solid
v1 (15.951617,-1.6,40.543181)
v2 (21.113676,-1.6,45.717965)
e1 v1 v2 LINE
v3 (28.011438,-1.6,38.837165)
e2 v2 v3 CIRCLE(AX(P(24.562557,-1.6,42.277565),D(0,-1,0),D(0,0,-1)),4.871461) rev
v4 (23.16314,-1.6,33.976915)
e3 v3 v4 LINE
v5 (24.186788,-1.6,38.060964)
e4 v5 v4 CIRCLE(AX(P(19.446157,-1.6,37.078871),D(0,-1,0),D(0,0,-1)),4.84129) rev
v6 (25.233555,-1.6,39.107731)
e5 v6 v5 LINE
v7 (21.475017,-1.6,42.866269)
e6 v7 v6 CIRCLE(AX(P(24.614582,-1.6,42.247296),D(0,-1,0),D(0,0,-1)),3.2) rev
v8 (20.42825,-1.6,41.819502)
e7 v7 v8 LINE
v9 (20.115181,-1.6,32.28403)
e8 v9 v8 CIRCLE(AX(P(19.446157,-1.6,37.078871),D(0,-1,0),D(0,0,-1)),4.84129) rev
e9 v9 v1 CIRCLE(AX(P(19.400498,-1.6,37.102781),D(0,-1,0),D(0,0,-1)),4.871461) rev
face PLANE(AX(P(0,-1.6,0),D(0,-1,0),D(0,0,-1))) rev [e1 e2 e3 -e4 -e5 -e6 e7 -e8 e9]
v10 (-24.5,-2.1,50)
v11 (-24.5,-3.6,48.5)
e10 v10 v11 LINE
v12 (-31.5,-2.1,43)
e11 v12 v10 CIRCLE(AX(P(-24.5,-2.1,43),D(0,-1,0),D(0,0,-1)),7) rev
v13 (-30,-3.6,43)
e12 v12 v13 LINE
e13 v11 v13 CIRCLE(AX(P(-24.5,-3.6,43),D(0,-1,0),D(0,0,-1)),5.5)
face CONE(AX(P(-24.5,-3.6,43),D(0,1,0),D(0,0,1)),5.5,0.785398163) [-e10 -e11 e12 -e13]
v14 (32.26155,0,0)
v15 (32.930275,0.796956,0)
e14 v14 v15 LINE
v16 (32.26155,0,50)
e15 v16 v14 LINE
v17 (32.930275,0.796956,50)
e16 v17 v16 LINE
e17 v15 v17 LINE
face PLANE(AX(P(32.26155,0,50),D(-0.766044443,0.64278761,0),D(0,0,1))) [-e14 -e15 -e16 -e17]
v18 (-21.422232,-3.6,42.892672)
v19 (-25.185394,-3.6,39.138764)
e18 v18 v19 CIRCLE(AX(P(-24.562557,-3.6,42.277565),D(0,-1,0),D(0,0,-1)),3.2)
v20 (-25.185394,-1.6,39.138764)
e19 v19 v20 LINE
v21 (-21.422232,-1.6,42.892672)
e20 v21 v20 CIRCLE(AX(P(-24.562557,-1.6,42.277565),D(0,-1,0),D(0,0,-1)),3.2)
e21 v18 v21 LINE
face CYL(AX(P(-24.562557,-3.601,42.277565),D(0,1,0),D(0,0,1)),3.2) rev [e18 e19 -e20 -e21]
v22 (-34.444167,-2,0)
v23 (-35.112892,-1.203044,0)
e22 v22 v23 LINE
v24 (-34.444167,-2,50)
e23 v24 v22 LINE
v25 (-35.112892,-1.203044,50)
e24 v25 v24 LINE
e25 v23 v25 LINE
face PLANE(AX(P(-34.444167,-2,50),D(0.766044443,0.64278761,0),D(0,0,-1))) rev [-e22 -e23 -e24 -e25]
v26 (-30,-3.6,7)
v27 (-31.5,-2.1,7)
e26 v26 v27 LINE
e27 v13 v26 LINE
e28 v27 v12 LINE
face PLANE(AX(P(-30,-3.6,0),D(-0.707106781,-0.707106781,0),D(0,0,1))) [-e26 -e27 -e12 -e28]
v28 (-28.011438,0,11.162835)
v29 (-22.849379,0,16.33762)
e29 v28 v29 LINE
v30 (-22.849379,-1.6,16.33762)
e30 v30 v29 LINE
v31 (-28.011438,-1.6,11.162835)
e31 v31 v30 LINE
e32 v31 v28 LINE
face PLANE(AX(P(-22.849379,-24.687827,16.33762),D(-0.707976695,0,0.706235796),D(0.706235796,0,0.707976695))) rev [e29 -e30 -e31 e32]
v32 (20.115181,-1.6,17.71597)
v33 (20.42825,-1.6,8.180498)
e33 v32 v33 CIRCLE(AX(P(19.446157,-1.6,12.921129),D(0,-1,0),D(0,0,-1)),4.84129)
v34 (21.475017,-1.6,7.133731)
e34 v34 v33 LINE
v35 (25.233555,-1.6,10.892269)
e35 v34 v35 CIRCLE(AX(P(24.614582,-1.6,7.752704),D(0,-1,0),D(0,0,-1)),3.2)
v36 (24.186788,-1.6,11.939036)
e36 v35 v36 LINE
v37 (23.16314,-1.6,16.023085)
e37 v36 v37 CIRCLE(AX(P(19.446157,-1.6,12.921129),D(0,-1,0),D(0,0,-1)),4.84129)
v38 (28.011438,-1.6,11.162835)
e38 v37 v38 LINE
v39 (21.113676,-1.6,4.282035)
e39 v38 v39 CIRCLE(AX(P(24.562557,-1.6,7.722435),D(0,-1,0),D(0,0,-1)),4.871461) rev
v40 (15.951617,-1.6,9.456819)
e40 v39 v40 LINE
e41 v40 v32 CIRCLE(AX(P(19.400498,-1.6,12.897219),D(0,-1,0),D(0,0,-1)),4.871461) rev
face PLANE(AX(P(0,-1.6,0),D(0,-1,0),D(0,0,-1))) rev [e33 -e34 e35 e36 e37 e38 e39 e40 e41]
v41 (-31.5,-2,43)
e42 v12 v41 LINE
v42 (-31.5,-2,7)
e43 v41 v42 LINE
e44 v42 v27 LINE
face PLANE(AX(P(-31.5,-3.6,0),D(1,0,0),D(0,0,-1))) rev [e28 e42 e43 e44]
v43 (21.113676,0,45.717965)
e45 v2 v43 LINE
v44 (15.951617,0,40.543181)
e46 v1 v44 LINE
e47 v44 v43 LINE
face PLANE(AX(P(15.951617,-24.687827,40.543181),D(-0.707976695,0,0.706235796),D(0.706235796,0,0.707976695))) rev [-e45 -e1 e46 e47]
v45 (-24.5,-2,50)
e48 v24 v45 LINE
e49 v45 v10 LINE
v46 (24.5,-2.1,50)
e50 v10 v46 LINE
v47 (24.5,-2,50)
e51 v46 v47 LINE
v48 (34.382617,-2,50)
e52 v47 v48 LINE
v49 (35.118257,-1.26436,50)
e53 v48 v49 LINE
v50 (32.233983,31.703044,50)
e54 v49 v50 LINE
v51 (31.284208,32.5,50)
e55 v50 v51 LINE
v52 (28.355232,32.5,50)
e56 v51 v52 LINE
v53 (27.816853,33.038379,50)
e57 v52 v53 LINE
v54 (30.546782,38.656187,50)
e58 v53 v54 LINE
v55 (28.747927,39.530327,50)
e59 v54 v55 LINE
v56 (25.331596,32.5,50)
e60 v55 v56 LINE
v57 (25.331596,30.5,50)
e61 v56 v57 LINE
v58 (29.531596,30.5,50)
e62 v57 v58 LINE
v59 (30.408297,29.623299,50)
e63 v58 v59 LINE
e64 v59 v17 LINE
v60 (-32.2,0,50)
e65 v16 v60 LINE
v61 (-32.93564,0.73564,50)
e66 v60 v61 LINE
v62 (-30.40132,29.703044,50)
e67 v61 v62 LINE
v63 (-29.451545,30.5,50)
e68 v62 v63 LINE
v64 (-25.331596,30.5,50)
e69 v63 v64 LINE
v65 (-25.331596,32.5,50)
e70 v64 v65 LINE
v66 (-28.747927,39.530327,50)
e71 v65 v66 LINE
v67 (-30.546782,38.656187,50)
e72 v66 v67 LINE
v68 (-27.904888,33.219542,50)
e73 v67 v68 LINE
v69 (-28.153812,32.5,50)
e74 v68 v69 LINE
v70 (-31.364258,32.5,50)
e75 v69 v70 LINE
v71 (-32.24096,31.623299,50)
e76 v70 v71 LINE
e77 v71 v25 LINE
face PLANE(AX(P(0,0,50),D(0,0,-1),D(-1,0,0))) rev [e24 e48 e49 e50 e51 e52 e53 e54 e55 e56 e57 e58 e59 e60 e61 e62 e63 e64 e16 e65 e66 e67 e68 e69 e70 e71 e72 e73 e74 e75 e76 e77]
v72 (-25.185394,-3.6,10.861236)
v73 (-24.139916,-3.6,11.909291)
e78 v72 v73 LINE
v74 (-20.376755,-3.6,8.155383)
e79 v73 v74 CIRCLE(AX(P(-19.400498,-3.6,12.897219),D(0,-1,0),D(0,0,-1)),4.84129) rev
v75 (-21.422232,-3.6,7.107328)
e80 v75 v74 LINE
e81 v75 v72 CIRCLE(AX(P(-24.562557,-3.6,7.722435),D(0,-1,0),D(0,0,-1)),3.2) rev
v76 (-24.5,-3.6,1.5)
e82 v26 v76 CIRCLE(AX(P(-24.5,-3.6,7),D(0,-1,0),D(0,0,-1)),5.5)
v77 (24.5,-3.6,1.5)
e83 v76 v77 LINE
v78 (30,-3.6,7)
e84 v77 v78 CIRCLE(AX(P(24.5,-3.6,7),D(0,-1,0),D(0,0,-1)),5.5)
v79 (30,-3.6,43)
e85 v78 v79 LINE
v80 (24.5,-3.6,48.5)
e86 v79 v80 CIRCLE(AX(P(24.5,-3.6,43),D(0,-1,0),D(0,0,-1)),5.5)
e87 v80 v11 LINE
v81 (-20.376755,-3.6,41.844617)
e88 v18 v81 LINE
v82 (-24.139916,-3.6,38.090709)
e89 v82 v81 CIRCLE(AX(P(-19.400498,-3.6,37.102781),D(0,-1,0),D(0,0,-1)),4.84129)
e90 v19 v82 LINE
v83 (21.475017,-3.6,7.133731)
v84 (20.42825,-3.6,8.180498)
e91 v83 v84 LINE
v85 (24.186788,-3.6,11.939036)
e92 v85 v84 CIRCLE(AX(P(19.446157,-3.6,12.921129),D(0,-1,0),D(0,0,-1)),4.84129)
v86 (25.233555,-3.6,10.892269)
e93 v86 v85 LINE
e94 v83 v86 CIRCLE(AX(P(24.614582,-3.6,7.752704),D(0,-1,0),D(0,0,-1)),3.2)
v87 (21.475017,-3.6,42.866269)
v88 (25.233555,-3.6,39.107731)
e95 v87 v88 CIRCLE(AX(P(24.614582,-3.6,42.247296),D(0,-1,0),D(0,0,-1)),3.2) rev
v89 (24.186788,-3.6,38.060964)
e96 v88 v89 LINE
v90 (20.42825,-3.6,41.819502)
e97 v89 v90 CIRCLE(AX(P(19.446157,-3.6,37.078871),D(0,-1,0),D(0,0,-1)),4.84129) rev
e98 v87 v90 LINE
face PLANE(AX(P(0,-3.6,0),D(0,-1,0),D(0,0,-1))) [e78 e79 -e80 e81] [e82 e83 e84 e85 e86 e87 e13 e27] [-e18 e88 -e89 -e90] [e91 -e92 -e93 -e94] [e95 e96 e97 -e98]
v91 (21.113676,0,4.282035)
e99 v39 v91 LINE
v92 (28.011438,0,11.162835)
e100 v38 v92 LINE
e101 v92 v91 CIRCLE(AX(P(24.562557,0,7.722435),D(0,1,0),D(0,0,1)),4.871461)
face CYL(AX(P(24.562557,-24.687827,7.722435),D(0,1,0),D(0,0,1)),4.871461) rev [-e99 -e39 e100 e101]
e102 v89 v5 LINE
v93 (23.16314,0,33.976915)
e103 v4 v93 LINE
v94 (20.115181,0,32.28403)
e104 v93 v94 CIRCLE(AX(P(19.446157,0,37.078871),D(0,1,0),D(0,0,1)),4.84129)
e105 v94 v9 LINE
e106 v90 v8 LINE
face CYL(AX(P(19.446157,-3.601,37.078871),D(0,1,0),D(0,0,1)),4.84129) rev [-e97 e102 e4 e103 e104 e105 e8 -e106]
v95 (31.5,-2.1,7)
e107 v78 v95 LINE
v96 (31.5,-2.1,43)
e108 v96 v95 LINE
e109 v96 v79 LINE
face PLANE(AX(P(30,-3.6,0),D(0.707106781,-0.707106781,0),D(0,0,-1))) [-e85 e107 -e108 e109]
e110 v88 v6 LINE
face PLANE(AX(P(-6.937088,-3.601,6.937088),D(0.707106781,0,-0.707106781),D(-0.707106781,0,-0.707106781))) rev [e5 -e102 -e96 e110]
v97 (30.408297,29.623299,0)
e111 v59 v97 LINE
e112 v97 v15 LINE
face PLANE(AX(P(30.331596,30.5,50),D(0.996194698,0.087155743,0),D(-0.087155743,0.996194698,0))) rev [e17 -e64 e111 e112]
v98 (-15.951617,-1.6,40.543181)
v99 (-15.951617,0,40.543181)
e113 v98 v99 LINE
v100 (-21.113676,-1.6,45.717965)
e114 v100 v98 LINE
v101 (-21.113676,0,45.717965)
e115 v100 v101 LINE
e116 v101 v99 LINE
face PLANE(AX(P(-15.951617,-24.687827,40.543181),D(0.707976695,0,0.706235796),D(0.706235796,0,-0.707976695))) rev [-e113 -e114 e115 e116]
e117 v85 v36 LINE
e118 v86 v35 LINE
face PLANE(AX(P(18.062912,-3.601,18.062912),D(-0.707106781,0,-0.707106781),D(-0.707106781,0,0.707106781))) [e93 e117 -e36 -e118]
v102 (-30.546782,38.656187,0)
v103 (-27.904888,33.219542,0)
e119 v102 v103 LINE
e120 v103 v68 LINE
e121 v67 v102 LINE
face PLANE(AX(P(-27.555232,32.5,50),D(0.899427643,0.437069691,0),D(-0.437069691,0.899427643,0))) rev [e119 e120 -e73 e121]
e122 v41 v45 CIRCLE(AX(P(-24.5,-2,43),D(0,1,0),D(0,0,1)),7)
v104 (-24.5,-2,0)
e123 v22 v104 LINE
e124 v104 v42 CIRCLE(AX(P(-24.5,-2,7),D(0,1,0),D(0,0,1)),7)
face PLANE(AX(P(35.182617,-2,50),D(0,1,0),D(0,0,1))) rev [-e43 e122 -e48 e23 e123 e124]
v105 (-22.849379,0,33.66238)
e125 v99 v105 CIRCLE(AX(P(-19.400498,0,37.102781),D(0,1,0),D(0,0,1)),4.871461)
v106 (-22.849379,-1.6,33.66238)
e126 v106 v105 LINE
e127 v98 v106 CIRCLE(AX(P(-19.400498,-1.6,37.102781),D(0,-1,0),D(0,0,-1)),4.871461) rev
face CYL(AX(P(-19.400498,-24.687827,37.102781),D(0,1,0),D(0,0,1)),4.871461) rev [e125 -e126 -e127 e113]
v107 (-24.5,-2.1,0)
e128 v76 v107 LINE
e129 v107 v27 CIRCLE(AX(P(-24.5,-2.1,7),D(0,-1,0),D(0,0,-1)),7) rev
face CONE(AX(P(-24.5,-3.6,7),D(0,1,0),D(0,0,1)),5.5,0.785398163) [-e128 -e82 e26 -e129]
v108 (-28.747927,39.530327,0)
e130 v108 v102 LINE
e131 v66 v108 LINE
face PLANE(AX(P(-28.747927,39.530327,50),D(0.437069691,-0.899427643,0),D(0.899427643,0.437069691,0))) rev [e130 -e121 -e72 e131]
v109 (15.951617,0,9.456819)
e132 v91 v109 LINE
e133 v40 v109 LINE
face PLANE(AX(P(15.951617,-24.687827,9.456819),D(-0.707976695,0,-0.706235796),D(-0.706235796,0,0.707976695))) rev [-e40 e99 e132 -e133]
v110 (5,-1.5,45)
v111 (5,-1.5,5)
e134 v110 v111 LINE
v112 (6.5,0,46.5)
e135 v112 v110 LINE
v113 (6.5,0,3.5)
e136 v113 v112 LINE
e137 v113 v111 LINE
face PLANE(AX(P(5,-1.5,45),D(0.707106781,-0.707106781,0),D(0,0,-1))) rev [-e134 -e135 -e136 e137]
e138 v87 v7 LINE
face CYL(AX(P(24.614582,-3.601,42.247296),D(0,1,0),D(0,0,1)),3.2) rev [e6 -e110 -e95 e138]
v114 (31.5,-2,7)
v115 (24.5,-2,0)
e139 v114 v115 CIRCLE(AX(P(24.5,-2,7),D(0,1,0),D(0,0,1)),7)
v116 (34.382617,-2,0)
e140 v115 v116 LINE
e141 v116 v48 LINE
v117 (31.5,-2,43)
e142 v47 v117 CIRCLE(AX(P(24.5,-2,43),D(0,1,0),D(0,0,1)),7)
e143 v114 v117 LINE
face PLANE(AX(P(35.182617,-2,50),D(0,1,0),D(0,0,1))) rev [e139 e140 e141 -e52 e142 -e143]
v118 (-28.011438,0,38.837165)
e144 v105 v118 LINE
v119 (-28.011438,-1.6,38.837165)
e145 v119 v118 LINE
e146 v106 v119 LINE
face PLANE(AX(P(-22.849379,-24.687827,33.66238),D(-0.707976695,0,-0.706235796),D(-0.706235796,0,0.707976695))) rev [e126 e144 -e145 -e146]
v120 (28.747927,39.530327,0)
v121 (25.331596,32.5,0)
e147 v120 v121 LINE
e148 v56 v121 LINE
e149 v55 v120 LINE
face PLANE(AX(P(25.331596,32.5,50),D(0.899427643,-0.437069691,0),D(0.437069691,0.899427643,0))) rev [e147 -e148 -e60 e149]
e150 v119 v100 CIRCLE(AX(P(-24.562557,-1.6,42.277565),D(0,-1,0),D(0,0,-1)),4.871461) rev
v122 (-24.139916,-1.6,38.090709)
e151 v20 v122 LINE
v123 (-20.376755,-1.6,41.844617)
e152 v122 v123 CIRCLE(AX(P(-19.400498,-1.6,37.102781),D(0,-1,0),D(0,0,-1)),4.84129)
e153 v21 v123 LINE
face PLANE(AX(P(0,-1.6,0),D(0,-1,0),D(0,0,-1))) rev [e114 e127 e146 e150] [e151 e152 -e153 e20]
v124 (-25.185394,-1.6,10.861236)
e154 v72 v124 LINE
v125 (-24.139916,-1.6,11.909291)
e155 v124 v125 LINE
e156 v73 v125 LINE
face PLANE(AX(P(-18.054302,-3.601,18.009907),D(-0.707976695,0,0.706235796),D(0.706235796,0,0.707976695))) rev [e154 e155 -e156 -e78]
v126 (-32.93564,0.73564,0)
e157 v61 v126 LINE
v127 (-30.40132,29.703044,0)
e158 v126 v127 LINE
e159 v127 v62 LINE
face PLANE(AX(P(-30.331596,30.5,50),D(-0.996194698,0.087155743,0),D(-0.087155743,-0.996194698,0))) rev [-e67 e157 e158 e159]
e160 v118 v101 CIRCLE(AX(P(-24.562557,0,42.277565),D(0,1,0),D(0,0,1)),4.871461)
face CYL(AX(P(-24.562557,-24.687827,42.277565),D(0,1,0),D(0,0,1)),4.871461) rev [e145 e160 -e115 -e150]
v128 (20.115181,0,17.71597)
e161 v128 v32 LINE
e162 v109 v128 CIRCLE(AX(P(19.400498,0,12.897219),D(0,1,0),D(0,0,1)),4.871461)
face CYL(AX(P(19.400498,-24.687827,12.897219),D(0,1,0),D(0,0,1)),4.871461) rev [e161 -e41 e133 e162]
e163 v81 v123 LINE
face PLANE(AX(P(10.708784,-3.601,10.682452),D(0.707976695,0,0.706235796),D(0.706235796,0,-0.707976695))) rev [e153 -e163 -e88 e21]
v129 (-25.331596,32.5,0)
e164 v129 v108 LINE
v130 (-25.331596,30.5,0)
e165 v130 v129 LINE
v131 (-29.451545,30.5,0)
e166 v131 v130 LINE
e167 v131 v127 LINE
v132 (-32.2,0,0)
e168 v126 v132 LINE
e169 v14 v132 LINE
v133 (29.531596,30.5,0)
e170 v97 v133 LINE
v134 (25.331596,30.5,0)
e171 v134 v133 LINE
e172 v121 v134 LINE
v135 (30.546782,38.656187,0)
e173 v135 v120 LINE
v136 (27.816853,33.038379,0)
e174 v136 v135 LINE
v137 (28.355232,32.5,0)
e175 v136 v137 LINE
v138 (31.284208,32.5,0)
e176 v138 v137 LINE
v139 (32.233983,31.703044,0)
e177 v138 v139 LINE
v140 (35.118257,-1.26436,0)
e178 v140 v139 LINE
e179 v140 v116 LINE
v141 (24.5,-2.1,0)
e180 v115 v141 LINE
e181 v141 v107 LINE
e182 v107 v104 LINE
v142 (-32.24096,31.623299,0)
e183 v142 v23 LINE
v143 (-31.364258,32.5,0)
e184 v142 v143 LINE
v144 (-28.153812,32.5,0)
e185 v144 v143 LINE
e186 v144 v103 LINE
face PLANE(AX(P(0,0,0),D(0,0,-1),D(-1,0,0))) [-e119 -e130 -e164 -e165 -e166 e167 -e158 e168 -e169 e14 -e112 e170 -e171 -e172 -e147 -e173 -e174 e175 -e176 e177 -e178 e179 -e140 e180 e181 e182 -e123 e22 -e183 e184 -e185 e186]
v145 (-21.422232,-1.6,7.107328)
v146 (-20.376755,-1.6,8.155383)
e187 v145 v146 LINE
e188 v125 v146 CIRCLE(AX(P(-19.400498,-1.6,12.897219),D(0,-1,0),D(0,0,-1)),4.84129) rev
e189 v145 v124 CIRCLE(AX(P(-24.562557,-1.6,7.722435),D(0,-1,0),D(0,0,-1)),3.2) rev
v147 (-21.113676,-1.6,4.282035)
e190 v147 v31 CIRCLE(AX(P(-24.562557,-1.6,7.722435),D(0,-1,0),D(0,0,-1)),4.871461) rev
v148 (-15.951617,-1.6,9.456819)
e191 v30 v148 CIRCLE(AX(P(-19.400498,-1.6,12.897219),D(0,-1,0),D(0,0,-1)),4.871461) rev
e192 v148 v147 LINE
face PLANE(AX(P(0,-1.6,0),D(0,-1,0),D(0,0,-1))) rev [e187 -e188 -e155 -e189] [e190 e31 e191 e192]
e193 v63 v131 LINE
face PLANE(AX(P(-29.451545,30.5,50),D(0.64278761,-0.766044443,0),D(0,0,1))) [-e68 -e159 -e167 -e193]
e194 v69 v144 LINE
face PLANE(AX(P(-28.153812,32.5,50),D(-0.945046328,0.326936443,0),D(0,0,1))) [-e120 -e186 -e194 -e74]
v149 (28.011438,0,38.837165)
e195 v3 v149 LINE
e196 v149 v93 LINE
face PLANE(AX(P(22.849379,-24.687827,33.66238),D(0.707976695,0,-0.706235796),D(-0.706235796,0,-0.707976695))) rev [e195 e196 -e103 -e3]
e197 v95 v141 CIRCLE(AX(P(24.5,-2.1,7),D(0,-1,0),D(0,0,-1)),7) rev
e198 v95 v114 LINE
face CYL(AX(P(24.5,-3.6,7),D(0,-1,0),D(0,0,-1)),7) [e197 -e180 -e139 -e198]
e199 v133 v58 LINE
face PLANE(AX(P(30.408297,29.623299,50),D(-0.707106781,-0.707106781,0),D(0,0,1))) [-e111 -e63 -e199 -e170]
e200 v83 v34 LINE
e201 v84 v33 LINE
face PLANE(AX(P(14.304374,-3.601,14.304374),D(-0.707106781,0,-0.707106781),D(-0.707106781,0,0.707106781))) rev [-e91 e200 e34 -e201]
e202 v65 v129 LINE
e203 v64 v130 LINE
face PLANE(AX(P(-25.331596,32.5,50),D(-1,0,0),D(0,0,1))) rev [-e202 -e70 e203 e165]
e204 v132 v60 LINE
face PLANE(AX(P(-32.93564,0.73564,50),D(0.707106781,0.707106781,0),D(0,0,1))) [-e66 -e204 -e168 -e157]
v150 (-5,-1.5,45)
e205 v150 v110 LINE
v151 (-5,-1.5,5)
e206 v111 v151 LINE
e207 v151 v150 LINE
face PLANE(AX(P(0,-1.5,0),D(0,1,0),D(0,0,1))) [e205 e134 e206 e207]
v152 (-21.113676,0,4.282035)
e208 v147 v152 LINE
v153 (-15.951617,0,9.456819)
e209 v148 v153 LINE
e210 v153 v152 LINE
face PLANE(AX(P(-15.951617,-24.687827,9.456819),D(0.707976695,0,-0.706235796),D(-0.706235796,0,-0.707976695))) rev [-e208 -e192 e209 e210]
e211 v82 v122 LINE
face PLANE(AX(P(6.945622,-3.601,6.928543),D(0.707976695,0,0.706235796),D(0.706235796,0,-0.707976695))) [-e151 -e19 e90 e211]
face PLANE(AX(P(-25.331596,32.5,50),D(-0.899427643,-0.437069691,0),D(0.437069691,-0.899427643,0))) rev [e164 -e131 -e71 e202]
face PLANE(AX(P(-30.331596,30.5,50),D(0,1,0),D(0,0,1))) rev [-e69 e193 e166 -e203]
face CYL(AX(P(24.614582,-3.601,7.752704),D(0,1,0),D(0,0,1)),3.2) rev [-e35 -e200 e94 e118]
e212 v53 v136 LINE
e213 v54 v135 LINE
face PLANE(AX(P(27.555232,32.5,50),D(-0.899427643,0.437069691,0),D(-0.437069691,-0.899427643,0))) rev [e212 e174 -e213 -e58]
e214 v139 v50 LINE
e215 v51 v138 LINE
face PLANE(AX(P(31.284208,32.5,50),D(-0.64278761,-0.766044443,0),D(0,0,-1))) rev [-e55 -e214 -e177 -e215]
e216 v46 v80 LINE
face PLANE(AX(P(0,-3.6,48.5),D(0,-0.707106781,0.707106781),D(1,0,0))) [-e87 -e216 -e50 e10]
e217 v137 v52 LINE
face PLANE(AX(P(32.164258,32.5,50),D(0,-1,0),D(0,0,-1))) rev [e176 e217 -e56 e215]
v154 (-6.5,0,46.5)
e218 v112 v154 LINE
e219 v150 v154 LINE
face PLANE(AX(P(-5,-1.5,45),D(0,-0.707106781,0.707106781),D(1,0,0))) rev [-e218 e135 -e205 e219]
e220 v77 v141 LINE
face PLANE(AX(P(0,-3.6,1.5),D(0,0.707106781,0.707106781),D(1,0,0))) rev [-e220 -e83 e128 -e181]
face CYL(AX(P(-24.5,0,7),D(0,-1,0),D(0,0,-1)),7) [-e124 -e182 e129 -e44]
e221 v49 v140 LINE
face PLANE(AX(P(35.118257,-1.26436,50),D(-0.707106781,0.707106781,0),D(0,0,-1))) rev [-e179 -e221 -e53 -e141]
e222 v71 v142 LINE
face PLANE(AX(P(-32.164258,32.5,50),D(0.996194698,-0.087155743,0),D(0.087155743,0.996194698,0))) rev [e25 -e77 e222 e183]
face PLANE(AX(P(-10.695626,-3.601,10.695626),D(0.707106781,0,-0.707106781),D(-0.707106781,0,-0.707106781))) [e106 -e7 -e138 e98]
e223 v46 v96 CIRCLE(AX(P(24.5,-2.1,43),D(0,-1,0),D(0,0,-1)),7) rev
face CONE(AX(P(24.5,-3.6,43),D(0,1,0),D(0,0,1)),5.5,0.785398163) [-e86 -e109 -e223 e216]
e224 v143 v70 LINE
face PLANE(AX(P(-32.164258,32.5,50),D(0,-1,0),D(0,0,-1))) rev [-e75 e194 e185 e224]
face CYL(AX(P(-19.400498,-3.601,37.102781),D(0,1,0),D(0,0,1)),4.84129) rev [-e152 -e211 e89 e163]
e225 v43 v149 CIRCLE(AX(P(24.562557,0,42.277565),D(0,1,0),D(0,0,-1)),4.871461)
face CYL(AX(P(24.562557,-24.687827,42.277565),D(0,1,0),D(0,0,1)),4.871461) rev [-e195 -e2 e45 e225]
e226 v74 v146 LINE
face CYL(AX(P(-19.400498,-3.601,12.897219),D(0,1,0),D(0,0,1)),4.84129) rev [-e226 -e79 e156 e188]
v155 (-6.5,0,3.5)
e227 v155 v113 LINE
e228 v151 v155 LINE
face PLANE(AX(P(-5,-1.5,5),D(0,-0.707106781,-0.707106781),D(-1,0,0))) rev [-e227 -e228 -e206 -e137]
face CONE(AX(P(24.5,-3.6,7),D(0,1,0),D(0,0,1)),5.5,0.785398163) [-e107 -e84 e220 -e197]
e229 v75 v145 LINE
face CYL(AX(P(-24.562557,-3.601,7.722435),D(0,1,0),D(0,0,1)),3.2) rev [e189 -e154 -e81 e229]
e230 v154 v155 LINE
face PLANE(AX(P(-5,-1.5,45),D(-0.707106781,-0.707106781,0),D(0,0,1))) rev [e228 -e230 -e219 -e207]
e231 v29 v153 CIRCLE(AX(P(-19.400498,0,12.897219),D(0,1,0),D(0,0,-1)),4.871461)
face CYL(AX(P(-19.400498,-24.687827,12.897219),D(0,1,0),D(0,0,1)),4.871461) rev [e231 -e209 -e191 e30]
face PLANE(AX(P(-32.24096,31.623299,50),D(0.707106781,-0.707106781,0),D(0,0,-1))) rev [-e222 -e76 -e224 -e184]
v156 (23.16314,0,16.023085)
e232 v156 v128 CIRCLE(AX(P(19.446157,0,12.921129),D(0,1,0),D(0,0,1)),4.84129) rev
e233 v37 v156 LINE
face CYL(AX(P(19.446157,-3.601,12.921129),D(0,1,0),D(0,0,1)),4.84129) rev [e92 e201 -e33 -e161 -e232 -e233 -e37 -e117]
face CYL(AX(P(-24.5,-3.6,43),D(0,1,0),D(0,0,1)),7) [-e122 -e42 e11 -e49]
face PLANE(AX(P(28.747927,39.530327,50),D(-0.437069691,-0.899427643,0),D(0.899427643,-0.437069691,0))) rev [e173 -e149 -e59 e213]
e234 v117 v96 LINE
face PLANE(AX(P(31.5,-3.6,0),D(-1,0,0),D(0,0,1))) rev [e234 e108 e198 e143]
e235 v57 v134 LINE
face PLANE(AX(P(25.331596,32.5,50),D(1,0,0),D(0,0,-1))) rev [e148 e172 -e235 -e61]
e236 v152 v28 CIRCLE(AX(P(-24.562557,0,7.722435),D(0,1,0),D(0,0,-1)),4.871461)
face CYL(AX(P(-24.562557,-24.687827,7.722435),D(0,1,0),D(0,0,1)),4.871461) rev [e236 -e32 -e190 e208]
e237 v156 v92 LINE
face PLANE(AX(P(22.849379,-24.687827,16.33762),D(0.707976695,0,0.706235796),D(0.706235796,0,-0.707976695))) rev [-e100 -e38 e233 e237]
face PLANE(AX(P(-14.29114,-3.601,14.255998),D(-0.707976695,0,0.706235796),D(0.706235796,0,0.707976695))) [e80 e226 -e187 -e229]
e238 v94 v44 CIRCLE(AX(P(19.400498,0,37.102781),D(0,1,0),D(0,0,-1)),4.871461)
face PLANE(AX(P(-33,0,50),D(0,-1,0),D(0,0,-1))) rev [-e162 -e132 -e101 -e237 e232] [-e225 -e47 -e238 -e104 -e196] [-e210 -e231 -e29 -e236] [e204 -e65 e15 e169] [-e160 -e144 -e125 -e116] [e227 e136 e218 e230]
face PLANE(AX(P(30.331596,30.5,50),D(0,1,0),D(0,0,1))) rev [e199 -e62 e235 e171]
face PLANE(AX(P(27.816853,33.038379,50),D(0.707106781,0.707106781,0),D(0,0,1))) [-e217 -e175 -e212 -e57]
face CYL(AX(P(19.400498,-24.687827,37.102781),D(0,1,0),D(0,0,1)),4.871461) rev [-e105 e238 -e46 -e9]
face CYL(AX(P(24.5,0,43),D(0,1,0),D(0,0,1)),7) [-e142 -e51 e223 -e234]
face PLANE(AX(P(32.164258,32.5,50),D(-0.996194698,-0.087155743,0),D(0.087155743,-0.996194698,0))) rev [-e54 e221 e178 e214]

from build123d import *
from OCP.BRepFilletAPI import BRepFilletAPI_MakeChamfer

# Parameters (mm, degrees)
BOSS_EXTRUDE1_DEPTH = 50
SKETCH5_W           = 63
SKETCH5_H           = 50
BOSS_EXTRUDE2_DEPTH = 1.6
SKETCH9_W           = 10
SKETCH9_H           = 40
CUT_EXTRUDE4_DEPTH  = 1.5
CHAMFER4_SIZE       = 1.5
CHAMFER6_SIZE       = 0.8
CHAMFER6_SIZE2      = 0.738449877
CHAMFER7_SIZE       = 0.8
CHAMFER7_SIZE2      = 0.880050294
CHAMFER7_SIZE2_2    = 0.59857957
FILLET1_R           = 7
CHAMFER10_SIZE      = 1.5
CUT_EXTRUDE5_REACH  = 74.773
CUT_EXTRUDE6_DEPTH  = 1.6


with BuildPart() as part:
    # Sketch1 → Boss-Extrude1 (new body)
    with BuildSketch(Plane.XY):
        Polygon((-32.16425811, 32.5), (-27.555232111, 32.5), (-30.546782223, 38.65618727), (-28.747926936, 39.530326652), (-25.331595762, 32.5), (-25.331595762, 30.5), (-30.331595762, 30.5), (-33, 0), (0, 0), (33, 0), (30.331595762, 30.5), (25.331595762, 30.5), (25.331595762, 32.5), (28.747926936, 39.530326652), (30.546782223, 38.65618727), (27.555232111, 32.5), (32.16425811, 32.5), (35.182617002, -2), (0, -2), (-35.182617002, -2), align=None)
    extrude(amount=BOSS_EXTRUDE1_DEPTH)

    # Sketch5 → Boss-Extrude2 (add)
    with BuildSketch(Plane.XZ.offset(2)):
        with Locations((0, 25)):
            Rectangle(SKETCH5_W, SKETCH5_H)
    extrude(amount=BOSS_EXTRUDE2_DEPTH)

    # Sketch9 → Cut-Extrude4 (cut)
    with BuildSketch(Plane(origin=(0, 0, 0), x_dir=(1, 0, 0), z_dir=(0, 1, 0))):
        with Locations((0, -25)):
            Rectangle(SKETCH9_W, SKETCH9_H)
    extrude(amount=-CUT_EXTRUDE4_DEPTH, mode=Mode.SUBTRACT)

    # Chamfer4
    chamfer4_edges = [part.edges().sort_by_distance(p)[0] for p in [
        (0, 0, 45),
        (-5, 0, 25),
        (0, 0, 5),
        (5, 0, 25),
    ]]
    chamfer(chamfer4_edges, length=CHAMFER4_SIZE - 0.0001)  # a hair under: the kernel refuses the full size

    # Chamfer6: one chamfer whose edges measure the first distance from different faces: ONE call of the kernel's chamfer builder (chamfer() names one face for all edges)
    chamfer6_edges_1 = [part.edges().sort_by_distance(p)[0] for p in [
        (-33, 0, 25),
    ]]
    chamfer6_side_1 = [part.faces().sort_by_distance(p)[0] for p in [
        (0, 0, 47.327909662),
    ]]
    chamfer6_edges_2 = [part.edges().sort_by_distance(p)[0] for p in [
        (33, 0, 25),
    ]]
    chamfer6_side_2 = [part.faces().sort_by_distance(p)[0] for p in [
        (31.665797881, 15.25, 25),
    ]]
    chamfer6_edges_3 = [part.edges().sort_by_distance(p)[0] for p in [
        (35.182617002, -2, 25),
    ]]
    chamfer6_side_3 = [part.faces().sort_by_distance(p)[0] for p in [
        (33.341308501, -2, 25),
    ]]
    chamfer6_edges_4 = [part.edges().sort_by_distance(p)[0] for p in [
        (-35.182617002, -2, 25),
    ]]
    chamfer6_side_4 = [part.faces().sort_by_distance(p)[0] for p in [
        (-33.673437556, 15.25, 25),
    ]]
    chamfer6 = BRepFilletAPI_MakeChamfer(part.part.solid().wrapped)
    for e in chamfer6_edges_1:
        chamfer6.Add(CHAMFER6_SIZE, CHAMFER6_SIZE2, e.wrapped, chamfer6_side_1[0].wrapped)  # the first distance lies on this face
    for e in chamfer6_edges_2:
        chamfer6.Add(CHAMFER6_SIZE, CHAMFER6_SIZE2, e.wrapped, chamfer6_side_2[0].wrapped)  # the first distance lies on this face
    for e in chamfer6_edges_3:
        chamfer6.Add(CHAMFER6_SIZE, CHAMFER6_SIZE2, e.wrapped, chamfer6_side_3[0].wrapped)  # the first distance lies on this face
    for e in chamfer6_edges_4:
        chamfer6.Add(CHAMFER6_SIZE, CHAMFER6_SIZE2, e.wrapped, chamfer6_side_4[0].wrapped)  # the first distance lies on this face
    add(Compound.cast(chamfer6.Shape()), mode=Mode.REPLACE)

    # Chamfer7: one chamfer whose edges measure the first distance from different faces: ONE call of the kernel's chamfer builder (chamfer() names one face for all edges)
    chamfer7_edges_1 = [part.edges().sort_by_distance(p)[0] for p in [
        (-30.331595762, 30.5, 25),
    ]]
    chamfer7_side_1 = [part.faces().sort_by_distance(p)[0] for p in [
        (-31.633617807, 15.617819926, 25),
    ]]
    chamfer7_edges_2 = [part.edges().sort_by_distance(p)[0] for p in [
        (30.331595762, 30.5, 25),
    ]]
    chamfer7_side_2 = [part.faces().sort_by_distance(p)[0] for p in [
        (27.831595762, 30.5, 25),
    ]]
    chamfer7_edges_3 = [part.edges().sort_by_distance(p)[0] for p in [
        (27.555232111, 32.5, 25),
    ]]
    chamfer7_side_3 = [part.faces().sort_by_distance(p)[0] for p in [
        (29.859745111, 32.5, 25),
    ]]
    chamfer7_edges_4 = [part.edges().sort_by_distance(p)[0] for p in [
        (32.16425811, 32.5, 25),
    ]]
    chamfer7_side_4 = [part.faces().sort_by_distance(p)[0] for p in [
        (33.641257483, 15.617819926, 25),
    ]]
    chamfer7_edges_5 = [part.edges().sort_by_distance(p)[0] for p in [
        (-32.16425811, 32.5, 25),
    ]]
    chamfer7_side_5 = [part.faces().sort_by_distance(p)[0] for p in [
        (-29.859745111, 32.5, 25),
    ]]
    chamfer7_edges_6 = [part.edges().sort_by_distance(p)[0] for p in [
        (-27.555232111, 32.5, 25),
    ]]
    chamfer7_side_6 = [part.faces().sort_by_distance(p)[0] for p in [
        (-29.051007167, 35.578093635, 25),
    ]]
    chamfer7 = BRepFilletAPI_MakeChamfer(part.part.solid().wrapped)
    for e in chamfer7_edges_1:
        chamfer7.Add(CHAMFER7_SIZE, CHAMFER7_SIZE2, e.wrapped, chamfer7_side_1[0].wrapped)  # the first distance lies on this face
    for e in chamfer7_edges_2:
        chamfer7.Add(CHAMFER7_SIZE, CHAMFER7_SIZE2, e.wrapped, chamfer7_side_2[0].wrapped)  # the first distance lies on this face
    for e in chamfer7_edges_3:
        chamfer7.Add(CHAMFER7_SIZE, CHAMFER7_SIZE2_2, e.wrapped, chamfer7_side_3[0].wrapped)  # the first distance lies on this face
    for e in chamfer7_edges_4:
        chamfer7.Add(CHAMFER7_SIZE, CHAMFER7_SIZE2, e.wrapped, chamfer7_side_4[0].wrapped)  # the first distance lies on this face
    for e in chamfer7_edges_5:
        chamfer7.Add(CHAMFER7_SIZE, CHAMFER7_SIZE2, e.wrapped, chamfer7_side_5[0].wrapped)  # the first distance lies on this face
    for e in chamfer7_edges_6:
        chamfer7.Add(CHAMFER7_SIZE, CHAMFER7_SIZE2_2, e.wrapped, chamfer7_side_6[0].wrapped)  # the first distance lies on this face
    add(Compound.cast(chamfer7.Shape()), mode=Mode.REPLACE)

    # Fillet1
    fillet1_edges = [part.edges().sort_by_distance(p)[0] for p in [
        (-31.5, -2.8, 0),
        (31.5, -2.8, 0),
        (31.5, -2.8, 50),
        (-31.5, -2.8, 50),
    ]]
    fillet(fillet1_edges, radius=FILLET1_R)

    # Chamfer10
    chamfer10_edges = [part.edges().sort_by_distance(p)[0] for p in [
        (-31.5, -3.6, 25),
        (0, -3.6, 50),
        (0, -3.6, 0),
        (31.5, -3.6, 25),
        (29.449747468, -3.6, 47.949747468),
        (29.449747468, -3.6, 2.050252532),
        (-29.449747468, -3.6, 2.050252532),
        (-29.449747468, -3.6, 47.949747468),
    ]]
    chamfer(chamfer10_edges, length=CHAMFER10_SIZE)

    # Sketch15 → Cut-Extrude5 (cut, up to next)
    with BuildSketch(Plane(origin=(0, 0, 0), x_dir=(1, 0, 0), z_dir=(0, 1, 0)), mode=Mode.PRIVATE) as cut_extrude5_sk1:
        with BuildLine():
            Line((21.475016583, -42.866268583), (20.428249938, -41.819501939))
            ThreePointArc((20.428249938, -41.819501939), (16.022847213, -33.655561292), (24.186787861, -38.060964016))
            Line((24.186787861, -38.060964016), (25.233554505, -39.107730661))
            ThreePointArc((25.233554505, -39.107730661), (26.877324102, -44.51003818), (21.475016583, -42.866268583))
        make_face()
    cut_extrude5_tool1 = extrude(cut_extrude5_sk1.sketch, amount=-CUT_EXTRUDE5_REACH, mode=Mode.PRIVATE) & part.part
    # Sketch15 → Cut-Extrude5 (cut, up to next)
    with BuildSketch(Plane(origin=(0, 0, 0), x_dir=(1, 0, 0), z_dir=(0, 1, 0)), mode=Mode.PRIVATE) as cut_extrude5_sk2:
        with BuildLine():
            Line((-25.185393692, -39.138763585), (-24.139916413, -38.090709162))
            ThreePointArc((-24.139916413, -38.090709162), (-15.98140501, -33.675259948), (-20.37675457, -41.844617469))
            Line((-20.37675457, -41.844617469), (-21.422231849, -42.892671893))
            ThreePointArc((-21.422231849, -42.892671893), (-26.822511792, -44.543090495), (-25.185393692, -39.138763585))
        make_face()
    cut_extrude5_tool2 = extrude(cut_extrude5_sk2.sketch, amount=-CUT_EXTRUDE5_REACH, mode=Mode.PRIVATE) & part.part
    # Sketch15 → Cut-Extrude5 (cut, up to next)
    with BuildSketch(Plane(origin=(0, 0, 0), x_dir=(1, 0, 0), z_dir=(0, 1, 0)), mode=Mode.PRIVATE) as cut_extrude5_sk3:
        with BuildLine():
            Line((25.233554505, -10.892269339), (24.186787861, -11.939035984))
            ThreePointArc((24.186787861, -11.939035984), (16.022847213, -16.344438708), (20.428249938, -8.180498061))
            Line((20.428249938, -8.180498061), (21.475016583, -7.133731417))
            ThreePointArc((21.475016583, -7.133731417), (26.877324102, -5.48996182), (25.233554505, -10.892269339))
        make_face()
    cut_extrude5_tool3 = extrude(cut_extrude5_sk3.sketch, amount=-CUT_EXTRUDE5_REACH, mode=Mode.PRIVATE) & part.part
    # Sketch15 → Cut-Extrude5 (cut, up to next)
    with BuildSketch(Plane(origin=(0, 0, 0), x_dir=(1, 0, 0), z_dir=(0, 1, 0)), mode=Mode.PRIVATE) as cut_extrude5_sk4:
        with BuildLine():
            Line((-21.422231849, -7.107328107), (-20.37675457, -8.155382531))
            ThreePointArc((-20.37675457, -8.155382531), (-15.98140501, -16.324740052), (-24.139916413, -11.909290838))
            Line((-24.139916413, -11.909290838), (-25.185393692, -10.861236415))
            ThreePointArc((-25.185393692, -10.861236415), (-26.822511792, -5.456909505), (-21.422231849, -7.107328107))
        make_face()
    cut_extrude5_tool4 = extrude(cut_extrude5_sk4.sketch, amount=-CUT_EXTRUDE5_REACH, mode=Mode.PRIVATE) & part.part
    add(cut_extrude5_tool1.solids().sort_by_distance((21.014912, 0, 38.647626))[0], mode=Mode.SUBTRACT)
    add(cut_extrude5_tool2.solids().sort_by_distance((-20.96732, 0, 38.673466))[0], mode=Mode.SUBTRACT)
    add(cut_extrude5_tool3.solids().sort_by_distance((21.014912, 0, 11.352374))[0], mode=Mode.SUBTRACT)
    add(cut_extrude5_tool4.solids().sort_by_distance((-20.96732, 0, 11.326534))[0], mode=Mode.SUBTRACT)

    # Sketch16 → Cut-Extrude6 (cut)
    with BuildSketch(Plane(origin=(0, 0, 0), x_dir=(1, 0, 0), z_dir=(0, 1, 0))):
        with BuildLine():
            Line((-15.951616609, -40.543181032), (-21.113676241, -45.71796535))
            ThreePointArc((-21.113676241, -45.71796535), (-28.002957525, -45.726446075), (-28.011438251, -38.837164791))
            Line((-28.011438251, -38.837164791), (-22.849378618, -33.662380473))
            ThreePointArc((-22.849378618, -33.662380473), (-15.960097334, -33.653899748), (-15.951616609, -40.543181032))
        make_face()
        with BuildLine():
            Line((-15.951616609, -9.456818968), (-21.113676241, -4.28203465))
            ThreePointArc((-21.113676241, -4.28203465), (-28.002957525, -4.273553925), (-28.011438251, -11.162835209))
            Line((-28.011438251, -11.162835209), (-22.849378618, -16.337619527))
            ThreePointArc((-22.849378618, -16.337619527), (-15.960097334, -16.346100252), (-15.951616609, -9.456818968))
        make_face()
        with BuildLine():
            Line((15.951616609, -40.543181032), (21.113676241, -45.71796535))
            ThreePointArc((21.113676241, -45.71796535), (28.002957525, -45.726446075), (28.011438251, -38.837164791))
            Line((28.011438251, -38.837164791), (22.849378618, -33.662380473))
            ThreePointArc((22.849378618, -33.662380473), (15.960097334, -33.653899748), (15.951616609, -40.543181032))
        make_face()
        with BuildLine():
            Line((15.951616609, -9.456818968), (21.113676241, -4.28203465))
            ThreePointArc((21.113676241, -4.28203465), (28.002957525, -4.273553925), (28.011438251, -11.162835209))
            Line((28.011438251, -11.162835209), (22.849378618, -16.337619527))
            ThreePointArc((22.849378618, -16.337619527), (15.960097334, -16.346100252), (15.951616609, -9.456818968))
        make_face()
    extrude(amount=-CUT_EXTRUDE6_DEPTH, mode=Mode.SUBTRACT)


solid = part.part
